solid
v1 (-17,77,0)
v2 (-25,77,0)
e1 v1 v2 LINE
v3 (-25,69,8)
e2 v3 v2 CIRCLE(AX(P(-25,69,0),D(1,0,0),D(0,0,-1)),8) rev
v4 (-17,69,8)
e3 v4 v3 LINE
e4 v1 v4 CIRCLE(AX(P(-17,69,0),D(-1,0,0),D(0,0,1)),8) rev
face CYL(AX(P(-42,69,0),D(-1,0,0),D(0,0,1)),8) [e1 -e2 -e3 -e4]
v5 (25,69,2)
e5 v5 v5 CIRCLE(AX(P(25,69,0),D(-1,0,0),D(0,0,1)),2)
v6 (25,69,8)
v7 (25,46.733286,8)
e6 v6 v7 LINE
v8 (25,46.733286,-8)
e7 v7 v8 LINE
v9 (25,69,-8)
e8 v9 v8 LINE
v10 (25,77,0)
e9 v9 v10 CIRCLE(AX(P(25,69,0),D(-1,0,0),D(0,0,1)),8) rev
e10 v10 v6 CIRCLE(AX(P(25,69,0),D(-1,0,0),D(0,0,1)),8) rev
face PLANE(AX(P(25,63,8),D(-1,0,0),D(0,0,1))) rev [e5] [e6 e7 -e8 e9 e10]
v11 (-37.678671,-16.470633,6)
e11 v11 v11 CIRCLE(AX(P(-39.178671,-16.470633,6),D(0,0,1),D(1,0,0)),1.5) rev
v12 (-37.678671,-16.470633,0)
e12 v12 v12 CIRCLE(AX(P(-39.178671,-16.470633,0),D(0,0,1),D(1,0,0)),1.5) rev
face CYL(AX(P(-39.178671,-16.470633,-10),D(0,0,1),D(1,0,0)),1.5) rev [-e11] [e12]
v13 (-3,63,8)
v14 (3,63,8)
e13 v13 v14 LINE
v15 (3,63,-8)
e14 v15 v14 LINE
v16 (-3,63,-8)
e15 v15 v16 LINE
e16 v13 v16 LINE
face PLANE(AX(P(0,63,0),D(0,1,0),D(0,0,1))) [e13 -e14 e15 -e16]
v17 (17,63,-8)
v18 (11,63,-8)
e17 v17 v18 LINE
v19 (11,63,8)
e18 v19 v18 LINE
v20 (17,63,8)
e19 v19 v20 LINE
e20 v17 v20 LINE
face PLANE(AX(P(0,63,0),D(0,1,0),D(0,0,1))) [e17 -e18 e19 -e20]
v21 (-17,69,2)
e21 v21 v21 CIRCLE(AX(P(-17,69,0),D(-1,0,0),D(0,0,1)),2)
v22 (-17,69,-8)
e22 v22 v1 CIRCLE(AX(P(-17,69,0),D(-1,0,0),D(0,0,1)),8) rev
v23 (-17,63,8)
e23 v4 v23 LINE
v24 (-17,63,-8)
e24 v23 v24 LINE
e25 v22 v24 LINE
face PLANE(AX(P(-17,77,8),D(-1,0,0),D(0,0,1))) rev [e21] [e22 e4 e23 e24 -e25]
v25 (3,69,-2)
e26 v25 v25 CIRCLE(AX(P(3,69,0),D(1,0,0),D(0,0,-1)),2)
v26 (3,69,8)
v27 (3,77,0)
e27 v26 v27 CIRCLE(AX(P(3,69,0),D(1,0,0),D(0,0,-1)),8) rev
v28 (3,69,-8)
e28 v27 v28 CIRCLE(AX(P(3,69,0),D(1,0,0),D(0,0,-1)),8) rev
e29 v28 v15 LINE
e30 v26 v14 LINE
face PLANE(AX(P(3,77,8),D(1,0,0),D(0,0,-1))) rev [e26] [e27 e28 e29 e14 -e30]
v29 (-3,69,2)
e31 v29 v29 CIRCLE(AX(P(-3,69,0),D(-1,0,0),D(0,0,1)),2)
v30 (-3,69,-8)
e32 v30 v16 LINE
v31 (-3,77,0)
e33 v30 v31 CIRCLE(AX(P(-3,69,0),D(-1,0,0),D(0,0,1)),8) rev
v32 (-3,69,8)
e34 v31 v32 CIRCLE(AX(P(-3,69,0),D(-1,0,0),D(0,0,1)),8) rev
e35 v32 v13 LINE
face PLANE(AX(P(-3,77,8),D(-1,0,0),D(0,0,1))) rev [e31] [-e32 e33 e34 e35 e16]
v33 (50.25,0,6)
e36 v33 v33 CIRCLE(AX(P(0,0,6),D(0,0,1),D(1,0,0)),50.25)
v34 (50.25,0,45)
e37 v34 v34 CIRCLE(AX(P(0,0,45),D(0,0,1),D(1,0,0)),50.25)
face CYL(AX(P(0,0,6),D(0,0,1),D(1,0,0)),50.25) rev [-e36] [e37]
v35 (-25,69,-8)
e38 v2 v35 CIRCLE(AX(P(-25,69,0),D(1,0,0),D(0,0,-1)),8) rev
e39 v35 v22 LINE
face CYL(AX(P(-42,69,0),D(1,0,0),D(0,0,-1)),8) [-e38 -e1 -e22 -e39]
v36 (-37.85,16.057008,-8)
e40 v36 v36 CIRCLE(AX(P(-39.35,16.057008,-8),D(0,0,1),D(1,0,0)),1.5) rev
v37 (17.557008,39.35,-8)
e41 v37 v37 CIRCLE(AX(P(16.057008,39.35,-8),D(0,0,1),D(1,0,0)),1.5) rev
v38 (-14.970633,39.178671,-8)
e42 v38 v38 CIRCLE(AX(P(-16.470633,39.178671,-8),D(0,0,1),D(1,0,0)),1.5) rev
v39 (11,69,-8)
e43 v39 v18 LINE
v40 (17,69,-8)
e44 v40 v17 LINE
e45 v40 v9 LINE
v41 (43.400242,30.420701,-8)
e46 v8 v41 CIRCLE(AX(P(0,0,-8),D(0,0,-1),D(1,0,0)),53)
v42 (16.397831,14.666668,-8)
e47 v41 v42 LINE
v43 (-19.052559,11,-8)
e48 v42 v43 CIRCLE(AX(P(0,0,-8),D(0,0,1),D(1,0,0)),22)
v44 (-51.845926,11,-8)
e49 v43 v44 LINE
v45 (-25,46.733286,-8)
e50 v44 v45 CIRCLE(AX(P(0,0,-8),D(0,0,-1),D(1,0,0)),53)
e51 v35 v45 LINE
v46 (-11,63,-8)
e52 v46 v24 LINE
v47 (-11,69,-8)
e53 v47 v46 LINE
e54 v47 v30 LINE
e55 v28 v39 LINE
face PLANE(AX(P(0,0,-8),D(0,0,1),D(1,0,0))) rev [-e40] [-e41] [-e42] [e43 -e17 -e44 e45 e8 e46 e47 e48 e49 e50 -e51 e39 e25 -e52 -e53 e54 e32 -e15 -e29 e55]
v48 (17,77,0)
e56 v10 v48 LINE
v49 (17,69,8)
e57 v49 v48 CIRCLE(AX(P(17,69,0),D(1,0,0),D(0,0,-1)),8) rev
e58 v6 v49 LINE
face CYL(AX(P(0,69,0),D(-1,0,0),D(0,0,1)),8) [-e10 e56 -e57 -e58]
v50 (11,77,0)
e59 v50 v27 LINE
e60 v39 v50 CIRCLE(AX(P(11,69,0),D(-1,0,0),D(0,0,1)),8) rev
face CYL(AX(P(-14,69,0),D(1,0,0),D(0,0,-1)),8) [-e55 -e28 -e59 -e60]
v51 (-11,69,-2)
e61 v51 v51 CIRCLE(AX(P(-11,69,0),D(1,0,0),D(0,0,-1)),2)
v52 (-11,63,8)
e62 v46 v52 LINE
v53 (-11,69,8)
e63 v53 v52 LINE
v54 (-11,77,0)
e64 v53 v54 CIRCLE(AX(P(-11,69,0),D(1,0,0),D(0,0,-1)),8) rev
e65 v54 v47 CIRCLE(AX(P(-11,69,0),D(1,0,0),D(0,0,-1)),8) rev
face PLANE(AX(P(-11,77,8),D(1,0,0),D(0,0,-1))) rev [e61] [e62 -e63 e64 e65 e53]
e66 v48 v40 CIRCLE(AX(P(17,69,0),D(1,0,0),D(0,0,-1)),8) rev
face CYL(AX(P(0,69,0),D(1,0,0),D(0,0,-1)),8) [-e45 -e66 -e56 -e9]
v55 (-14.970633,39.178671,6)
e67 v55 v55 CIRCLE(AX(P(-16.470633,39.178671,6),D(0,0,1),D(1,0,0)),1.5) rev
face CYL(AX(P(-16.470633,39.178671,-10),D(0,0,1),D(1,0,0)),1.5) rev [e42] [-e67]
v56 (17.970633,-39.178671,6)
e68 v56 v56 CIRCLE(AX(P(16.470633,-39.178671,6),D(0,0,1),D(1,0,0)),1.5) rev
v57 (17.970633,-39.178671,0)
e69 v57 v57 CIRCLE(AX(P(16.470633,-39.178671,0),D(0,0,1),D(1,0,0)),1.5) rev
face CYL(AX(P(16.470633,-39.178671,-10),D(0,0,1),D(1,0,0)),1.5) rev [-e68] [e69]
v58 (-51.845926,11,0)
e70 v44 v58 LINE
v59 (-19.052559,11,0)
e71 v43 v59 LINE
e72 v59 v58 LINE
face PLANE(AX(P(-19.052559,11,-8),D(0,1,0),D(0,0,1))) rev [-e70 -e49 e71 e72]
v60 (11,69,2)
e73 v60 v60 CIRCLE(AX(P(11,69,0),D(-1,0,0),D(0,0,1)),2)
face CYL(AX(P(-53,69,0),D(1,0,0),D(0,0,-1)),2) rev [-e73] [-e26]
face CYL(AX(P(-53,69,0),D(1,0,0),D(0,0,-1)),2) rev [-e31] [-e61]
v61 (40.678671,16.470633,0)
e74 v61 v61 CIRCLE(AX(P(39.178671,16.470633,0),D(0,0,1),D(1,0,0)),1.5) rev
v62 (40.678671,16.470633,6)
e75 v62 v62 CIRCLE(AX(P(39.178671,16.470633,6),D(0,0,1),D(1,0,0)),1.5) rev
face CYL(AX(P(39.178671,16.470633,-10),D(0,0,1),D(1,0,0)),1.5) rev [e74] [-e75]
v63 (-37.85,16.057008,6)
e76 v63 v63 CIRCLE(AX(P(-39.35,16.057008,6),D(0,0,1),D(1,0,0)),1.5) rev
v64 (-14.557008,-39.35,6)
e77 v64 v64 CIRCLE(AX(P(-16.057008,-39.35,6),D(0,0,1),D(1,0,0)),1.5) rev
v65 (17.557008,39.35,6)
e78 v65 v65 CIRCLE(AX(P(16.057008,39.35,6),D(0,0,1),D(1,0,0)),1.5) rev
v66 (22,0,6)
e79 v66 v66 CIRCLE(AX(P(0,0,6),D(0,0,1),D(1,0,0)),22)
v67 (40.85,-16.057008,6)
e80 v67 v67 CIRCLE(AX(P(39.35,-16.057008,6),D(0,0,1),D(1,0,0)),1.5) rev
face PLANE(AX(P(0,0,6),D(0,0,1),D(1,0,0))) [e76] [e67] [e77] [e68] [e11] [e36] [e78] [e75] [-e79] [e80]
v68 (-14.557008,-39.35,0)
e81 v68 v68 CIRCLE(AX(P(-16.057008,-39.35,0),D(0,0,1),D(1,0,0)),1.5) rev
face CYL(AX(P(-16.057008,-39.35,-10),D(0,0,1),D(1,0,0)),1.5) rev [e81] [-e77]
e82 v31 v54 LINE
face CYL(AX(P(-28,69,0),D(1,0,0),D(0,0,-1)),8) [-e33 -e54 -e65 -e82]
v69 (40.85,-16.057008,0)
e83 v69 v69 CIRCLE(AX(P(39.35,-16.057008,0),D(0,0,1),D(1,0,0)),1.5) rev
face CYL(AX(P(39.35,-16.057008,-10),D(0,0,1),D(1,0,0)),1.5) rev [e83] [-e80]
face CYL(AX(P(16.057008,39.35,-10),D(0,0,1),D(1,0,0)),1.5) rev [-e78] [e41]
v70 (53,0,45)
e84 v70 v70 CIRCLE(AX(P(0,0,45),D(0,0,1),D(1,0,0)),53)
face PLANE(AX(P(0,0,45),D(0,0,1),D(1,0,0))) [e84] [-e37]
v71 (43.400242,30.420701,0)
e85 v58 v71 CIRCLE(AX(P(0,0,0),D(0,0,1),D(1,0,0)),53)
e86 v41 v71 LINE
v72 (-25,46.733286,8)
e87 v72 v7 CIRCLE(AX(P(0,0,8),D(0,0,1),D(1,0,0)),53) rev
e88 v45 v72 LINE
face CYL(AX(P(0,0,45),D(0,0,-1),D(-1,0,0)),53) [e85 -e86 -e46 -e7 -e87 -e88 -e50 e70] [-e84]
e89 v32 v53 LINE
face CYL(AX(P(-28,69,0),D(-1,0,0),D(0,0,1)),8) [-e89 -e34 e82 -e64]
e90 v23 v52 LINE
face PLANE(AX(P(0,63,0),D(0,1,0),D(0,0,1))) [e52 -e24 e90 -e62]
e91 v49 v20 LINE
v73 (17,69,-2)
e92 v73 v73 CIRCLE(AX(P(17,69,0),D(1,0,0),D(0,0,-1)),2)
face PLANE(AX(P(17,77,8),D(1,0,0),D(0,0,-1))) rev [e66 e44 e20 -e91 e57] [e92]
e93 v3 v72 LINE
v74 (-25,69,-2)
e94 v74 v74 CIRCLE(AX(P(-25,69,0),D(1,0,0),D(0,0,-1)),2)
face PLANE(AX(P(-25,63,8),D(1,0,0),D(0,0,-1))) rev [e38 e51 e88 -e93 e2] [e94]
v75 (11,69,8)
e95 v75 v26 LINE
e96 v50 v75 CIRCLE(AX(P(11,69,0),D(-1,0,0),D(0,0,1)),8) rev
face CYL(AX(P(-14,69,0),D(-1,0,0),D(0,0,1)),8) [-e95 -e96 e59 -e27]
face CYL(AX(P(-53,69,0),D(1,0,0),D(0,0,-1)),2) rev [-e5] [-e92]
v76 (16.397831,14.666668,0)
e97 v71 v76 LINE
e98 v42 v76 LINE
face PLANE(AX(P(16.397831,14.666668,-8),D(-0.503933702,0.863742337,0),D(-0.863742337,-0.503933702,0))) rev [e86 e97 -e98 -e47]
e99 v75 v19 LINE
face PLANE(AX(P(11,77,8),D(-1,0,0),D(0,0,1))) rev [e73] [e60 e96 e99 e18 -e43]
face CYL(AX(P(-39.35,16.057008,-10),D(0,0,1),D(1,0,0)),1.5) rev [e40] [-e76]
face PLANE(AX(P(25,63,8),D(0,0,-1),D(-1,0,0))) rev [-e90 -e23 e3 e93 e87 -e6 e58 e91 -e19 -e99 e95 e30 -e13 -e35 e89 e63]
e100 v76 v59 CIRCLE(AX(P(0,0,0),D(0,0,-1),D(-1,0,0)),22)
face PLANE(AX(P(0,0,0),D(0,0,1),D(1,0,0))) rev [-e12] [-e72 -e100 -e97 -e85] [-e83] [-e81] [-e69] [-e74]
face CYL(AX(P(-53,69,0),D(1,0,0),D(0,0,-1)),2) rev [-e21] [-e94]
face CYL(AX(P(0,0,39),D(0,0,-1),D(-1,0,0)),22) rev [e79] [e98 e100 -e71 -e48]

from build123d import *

# Parameters (mm, degrees)
SKETCH1_R               = 53
BOSS_EXTRUDE2_DEPTH     = 45
SKETCH2_R               = 50.25
CUT_EXTRUDE1_DEPTH      = 39
SKETCH4_R               = 22
CUT_EXTRUDE3_DEPTH      = 39
BOSS_EXTRUDE3_START     = 8
BOSS_EXTRUDE3_DEPTH     = 8
CUT_EXTRUDE5_DEPTH      = 10
CUT_EXTRUDE5_DEPTH_BACK = 10
SKETCH10_R              = 1.5
BOSS_EXTRUDE6_START     = -8
BOSS_EXTRUDE6_DEPTH     = 16
SKETCH13_W              = 8
SKETCH13_H              = 16
BOSS_EXTRUDE7_DEPTH     = 14
FILLET1_R               = 8
LPATTERN1_COUNT         = 4
LPATTERN1_PITCH         = 14
FILLET1_OF_LPATTERN1_R  = 8
CUT_EXTRUDE6_DEPTH      = 119.482066153
CUT_EXTRUDE6_DEPTH_BACK = 119.482066153
SKETCH14_R              = 2


# Read off the part's stored shape, not the designer's step: Boss-Extrude6
with BuildPart() as part:
    # Sketch1 → Boss-Extrude2 (new body)
    with BuildSketch(Plane.XY):
        with Locations(Location((0, 0, 0), (0, 0, 180))):
            Circle(SKETCH1_R)
    extrude(amount=BOSS_EXTRUDE2_DEPTH)

    # Sketch2 → Cut-Extrude1 (cut)
    with BuildSketch(Plane.XY.offset(45)):
        Circle(SKETCH2_R)
    extrude(amount=-CUT_EXTRUDE1_DEPTH, mode=Mode.SUBTRACT)

    # Sketch4 → Cut-Extrude3 (cut)
    with BuildSketch(Plane(origin=(0, 0, 0), x_dir=(-1, 0, 0), z_dir=(0, 0, -1))):
        Circle(SKETCH4_R)
    extrude(amount=-CUT_EXTRUDE3_DEPTH, mode=Mode.SUBTRACT)

    # Sketch5 → Boss-Extrude3 (add)
    with BuildSketch(Plane(origin=(0, 0, 0), x_dir=(-1, 0, 0), z_dir=(0, 0, -1)).offset(BOSS_EXTRUDE3_START)):
        with BuildLine():
            Line((19.052558883, 11), (51.845925587, 11))
            ThreePointArc((51.845925587, 11), (10.588828865, 51.931461594), (-43.400241675, 30.42070056))
            Line((-43.400241675, 30.42070056), (-16.397830673, 14.666667965))
            ThreePointArc((-16.397830673, 14.666667965), (2.263406494, 21.883258236), (19.052558883, 11))
        make_face()
    extrude(amount=-BOSS_EXTRUDE3_DEPTH)

    # Sketch10 → Cut-Extrude5 (cut, two sides: drawn at the far end of the back side and taken through both)
    with BuildSketch(Plane(origin=(0, 0, 0), x_dir=(-1, 0, 0), z_dir=(0, 0, -1)).offset(-CUT_EXTRUDE5_DEPTH_BACK)):
        with Locations(Location((-39.35, -16.057007816, 0), (0, 0, 180))):
            Circle(SKETCH10_R)
        with Locations(Location((-39.178670952, 16.470632727, 0), (0, 0, 180))):
            Circle(SKETCH10_R)
        with Locations(Location((-16.057007816, 39.35, 0), (0, 0, 180))):
            Circle(SKETCH10_R)
        with Locations(Location((16.470632727, 39.178670952, 0), (0, 0, 180))):
            Circle(SKETCH10_R)
        with Locations(Location((39.35, 16.057007816, 0), (0, 0, 180))):
            Circle(SKETCH10_R)
        with Locations(Location((39.178670952, -16.470632727, 0), (0, 0, 180))):
            Circle(SKETCH10_R)
        with Locations(Location((16.057007816, -39.35, 0), (0, 0, 180))):
            Circle(SKETCH10_R)
        with Locations(Location((-16.470632728, -39.178670952, 0), (0, 0, 180))):
            Circle(SKETCH10_R)
    extrude(amount=CUT_EXTRUDE5_DEPTH + CUT_EXTRUDE5_DEPTH_BACK, mode=Mode.SUBTRACT)

    # Boss-Extrude6 outline → Boss-Extrude6 (add)
    with BuildSketch(Plane.XY.offset(BOSS_EXTRUDE6_START)):
        with BuildLine():
            Line((-25, 63), (-25, 46.733285782))
            ThreePointArc((-25, 46.733285782), (0, 53), (25, 46.733285782))
            Line((25, 46.733285782), (25, 63))
            Line((25, 63), (-25, 63))
        make_face()
    extrude(amount=BOSS_EXTRUDE6_DEPTH)

    # Sketch13 → Boss-Extrude7 (add)
    with BuildSketch(Plane(origin=(0, 63, 0), x_dir=(1, 0, 0), z_dir=(0, 1, 0))):
        with Locations((21, 0)):
            Rectangle(SKETCH13_W, SKETCH13_H)
    boss_extrude7 = extrude(amount=BOSS_EXTRUDE7_DEPTH)

    # Fillet1
    fillet1_edges = [part.edges().sort_by_distance(p)[0] for p in [
        (21, 77, 8),
        (21, 77, -8),
    ]]
    fillet(fillet1_edges, radius=FILLET1_R - 0.0001)  # a hair under: the kernel refuses the full size

    # LPattern1: Boss-Extrude7 ×4
    with Locations(*[(-i * LPATTERN1_PITCH, 0, 0) for i in range(1, LPATTERN1_COUNT)]):
        add(boss_extrude7)

    # Fillet1 of LPattern1
    fillet1_of_lpattern1_edges = [part.edges().sort_by_distance(p)[0] for p in [
        (7, 77, 8),
        (7, 77, -8),
        (-7, 77, 8),
        (-7, 77, -8),
        (-21, 77, 8),
        (-21, 77, -8),
    ]]
    fillet(fillet1_of_lpattern1_edges, radius=FILLET1_OF_LPATTERN1_R - 0.0001)  # a hair under: the kernel refuses the full size

    # Sketch14 → Cut-Extrude6 (cut, two sides: drawn at the far end of the back side and taken through both)
    with BuildSketch(Plane(origin=(25, 0, 0), x_dir=(0, 0, -1), z_dir=(1, 0, 0)).offset(-CUT_EXTRUDE6_DEPTH_BACK)):
        with Locations((0, 69)):
            Circle(SKETCH14_R)
    extrude(amount=CUT_EXTRUDE6_DEPTH + CUT_EXTRUDE6_DEPTH_BACK, mode=Mode.SUBTRACT)


solid = part.part
